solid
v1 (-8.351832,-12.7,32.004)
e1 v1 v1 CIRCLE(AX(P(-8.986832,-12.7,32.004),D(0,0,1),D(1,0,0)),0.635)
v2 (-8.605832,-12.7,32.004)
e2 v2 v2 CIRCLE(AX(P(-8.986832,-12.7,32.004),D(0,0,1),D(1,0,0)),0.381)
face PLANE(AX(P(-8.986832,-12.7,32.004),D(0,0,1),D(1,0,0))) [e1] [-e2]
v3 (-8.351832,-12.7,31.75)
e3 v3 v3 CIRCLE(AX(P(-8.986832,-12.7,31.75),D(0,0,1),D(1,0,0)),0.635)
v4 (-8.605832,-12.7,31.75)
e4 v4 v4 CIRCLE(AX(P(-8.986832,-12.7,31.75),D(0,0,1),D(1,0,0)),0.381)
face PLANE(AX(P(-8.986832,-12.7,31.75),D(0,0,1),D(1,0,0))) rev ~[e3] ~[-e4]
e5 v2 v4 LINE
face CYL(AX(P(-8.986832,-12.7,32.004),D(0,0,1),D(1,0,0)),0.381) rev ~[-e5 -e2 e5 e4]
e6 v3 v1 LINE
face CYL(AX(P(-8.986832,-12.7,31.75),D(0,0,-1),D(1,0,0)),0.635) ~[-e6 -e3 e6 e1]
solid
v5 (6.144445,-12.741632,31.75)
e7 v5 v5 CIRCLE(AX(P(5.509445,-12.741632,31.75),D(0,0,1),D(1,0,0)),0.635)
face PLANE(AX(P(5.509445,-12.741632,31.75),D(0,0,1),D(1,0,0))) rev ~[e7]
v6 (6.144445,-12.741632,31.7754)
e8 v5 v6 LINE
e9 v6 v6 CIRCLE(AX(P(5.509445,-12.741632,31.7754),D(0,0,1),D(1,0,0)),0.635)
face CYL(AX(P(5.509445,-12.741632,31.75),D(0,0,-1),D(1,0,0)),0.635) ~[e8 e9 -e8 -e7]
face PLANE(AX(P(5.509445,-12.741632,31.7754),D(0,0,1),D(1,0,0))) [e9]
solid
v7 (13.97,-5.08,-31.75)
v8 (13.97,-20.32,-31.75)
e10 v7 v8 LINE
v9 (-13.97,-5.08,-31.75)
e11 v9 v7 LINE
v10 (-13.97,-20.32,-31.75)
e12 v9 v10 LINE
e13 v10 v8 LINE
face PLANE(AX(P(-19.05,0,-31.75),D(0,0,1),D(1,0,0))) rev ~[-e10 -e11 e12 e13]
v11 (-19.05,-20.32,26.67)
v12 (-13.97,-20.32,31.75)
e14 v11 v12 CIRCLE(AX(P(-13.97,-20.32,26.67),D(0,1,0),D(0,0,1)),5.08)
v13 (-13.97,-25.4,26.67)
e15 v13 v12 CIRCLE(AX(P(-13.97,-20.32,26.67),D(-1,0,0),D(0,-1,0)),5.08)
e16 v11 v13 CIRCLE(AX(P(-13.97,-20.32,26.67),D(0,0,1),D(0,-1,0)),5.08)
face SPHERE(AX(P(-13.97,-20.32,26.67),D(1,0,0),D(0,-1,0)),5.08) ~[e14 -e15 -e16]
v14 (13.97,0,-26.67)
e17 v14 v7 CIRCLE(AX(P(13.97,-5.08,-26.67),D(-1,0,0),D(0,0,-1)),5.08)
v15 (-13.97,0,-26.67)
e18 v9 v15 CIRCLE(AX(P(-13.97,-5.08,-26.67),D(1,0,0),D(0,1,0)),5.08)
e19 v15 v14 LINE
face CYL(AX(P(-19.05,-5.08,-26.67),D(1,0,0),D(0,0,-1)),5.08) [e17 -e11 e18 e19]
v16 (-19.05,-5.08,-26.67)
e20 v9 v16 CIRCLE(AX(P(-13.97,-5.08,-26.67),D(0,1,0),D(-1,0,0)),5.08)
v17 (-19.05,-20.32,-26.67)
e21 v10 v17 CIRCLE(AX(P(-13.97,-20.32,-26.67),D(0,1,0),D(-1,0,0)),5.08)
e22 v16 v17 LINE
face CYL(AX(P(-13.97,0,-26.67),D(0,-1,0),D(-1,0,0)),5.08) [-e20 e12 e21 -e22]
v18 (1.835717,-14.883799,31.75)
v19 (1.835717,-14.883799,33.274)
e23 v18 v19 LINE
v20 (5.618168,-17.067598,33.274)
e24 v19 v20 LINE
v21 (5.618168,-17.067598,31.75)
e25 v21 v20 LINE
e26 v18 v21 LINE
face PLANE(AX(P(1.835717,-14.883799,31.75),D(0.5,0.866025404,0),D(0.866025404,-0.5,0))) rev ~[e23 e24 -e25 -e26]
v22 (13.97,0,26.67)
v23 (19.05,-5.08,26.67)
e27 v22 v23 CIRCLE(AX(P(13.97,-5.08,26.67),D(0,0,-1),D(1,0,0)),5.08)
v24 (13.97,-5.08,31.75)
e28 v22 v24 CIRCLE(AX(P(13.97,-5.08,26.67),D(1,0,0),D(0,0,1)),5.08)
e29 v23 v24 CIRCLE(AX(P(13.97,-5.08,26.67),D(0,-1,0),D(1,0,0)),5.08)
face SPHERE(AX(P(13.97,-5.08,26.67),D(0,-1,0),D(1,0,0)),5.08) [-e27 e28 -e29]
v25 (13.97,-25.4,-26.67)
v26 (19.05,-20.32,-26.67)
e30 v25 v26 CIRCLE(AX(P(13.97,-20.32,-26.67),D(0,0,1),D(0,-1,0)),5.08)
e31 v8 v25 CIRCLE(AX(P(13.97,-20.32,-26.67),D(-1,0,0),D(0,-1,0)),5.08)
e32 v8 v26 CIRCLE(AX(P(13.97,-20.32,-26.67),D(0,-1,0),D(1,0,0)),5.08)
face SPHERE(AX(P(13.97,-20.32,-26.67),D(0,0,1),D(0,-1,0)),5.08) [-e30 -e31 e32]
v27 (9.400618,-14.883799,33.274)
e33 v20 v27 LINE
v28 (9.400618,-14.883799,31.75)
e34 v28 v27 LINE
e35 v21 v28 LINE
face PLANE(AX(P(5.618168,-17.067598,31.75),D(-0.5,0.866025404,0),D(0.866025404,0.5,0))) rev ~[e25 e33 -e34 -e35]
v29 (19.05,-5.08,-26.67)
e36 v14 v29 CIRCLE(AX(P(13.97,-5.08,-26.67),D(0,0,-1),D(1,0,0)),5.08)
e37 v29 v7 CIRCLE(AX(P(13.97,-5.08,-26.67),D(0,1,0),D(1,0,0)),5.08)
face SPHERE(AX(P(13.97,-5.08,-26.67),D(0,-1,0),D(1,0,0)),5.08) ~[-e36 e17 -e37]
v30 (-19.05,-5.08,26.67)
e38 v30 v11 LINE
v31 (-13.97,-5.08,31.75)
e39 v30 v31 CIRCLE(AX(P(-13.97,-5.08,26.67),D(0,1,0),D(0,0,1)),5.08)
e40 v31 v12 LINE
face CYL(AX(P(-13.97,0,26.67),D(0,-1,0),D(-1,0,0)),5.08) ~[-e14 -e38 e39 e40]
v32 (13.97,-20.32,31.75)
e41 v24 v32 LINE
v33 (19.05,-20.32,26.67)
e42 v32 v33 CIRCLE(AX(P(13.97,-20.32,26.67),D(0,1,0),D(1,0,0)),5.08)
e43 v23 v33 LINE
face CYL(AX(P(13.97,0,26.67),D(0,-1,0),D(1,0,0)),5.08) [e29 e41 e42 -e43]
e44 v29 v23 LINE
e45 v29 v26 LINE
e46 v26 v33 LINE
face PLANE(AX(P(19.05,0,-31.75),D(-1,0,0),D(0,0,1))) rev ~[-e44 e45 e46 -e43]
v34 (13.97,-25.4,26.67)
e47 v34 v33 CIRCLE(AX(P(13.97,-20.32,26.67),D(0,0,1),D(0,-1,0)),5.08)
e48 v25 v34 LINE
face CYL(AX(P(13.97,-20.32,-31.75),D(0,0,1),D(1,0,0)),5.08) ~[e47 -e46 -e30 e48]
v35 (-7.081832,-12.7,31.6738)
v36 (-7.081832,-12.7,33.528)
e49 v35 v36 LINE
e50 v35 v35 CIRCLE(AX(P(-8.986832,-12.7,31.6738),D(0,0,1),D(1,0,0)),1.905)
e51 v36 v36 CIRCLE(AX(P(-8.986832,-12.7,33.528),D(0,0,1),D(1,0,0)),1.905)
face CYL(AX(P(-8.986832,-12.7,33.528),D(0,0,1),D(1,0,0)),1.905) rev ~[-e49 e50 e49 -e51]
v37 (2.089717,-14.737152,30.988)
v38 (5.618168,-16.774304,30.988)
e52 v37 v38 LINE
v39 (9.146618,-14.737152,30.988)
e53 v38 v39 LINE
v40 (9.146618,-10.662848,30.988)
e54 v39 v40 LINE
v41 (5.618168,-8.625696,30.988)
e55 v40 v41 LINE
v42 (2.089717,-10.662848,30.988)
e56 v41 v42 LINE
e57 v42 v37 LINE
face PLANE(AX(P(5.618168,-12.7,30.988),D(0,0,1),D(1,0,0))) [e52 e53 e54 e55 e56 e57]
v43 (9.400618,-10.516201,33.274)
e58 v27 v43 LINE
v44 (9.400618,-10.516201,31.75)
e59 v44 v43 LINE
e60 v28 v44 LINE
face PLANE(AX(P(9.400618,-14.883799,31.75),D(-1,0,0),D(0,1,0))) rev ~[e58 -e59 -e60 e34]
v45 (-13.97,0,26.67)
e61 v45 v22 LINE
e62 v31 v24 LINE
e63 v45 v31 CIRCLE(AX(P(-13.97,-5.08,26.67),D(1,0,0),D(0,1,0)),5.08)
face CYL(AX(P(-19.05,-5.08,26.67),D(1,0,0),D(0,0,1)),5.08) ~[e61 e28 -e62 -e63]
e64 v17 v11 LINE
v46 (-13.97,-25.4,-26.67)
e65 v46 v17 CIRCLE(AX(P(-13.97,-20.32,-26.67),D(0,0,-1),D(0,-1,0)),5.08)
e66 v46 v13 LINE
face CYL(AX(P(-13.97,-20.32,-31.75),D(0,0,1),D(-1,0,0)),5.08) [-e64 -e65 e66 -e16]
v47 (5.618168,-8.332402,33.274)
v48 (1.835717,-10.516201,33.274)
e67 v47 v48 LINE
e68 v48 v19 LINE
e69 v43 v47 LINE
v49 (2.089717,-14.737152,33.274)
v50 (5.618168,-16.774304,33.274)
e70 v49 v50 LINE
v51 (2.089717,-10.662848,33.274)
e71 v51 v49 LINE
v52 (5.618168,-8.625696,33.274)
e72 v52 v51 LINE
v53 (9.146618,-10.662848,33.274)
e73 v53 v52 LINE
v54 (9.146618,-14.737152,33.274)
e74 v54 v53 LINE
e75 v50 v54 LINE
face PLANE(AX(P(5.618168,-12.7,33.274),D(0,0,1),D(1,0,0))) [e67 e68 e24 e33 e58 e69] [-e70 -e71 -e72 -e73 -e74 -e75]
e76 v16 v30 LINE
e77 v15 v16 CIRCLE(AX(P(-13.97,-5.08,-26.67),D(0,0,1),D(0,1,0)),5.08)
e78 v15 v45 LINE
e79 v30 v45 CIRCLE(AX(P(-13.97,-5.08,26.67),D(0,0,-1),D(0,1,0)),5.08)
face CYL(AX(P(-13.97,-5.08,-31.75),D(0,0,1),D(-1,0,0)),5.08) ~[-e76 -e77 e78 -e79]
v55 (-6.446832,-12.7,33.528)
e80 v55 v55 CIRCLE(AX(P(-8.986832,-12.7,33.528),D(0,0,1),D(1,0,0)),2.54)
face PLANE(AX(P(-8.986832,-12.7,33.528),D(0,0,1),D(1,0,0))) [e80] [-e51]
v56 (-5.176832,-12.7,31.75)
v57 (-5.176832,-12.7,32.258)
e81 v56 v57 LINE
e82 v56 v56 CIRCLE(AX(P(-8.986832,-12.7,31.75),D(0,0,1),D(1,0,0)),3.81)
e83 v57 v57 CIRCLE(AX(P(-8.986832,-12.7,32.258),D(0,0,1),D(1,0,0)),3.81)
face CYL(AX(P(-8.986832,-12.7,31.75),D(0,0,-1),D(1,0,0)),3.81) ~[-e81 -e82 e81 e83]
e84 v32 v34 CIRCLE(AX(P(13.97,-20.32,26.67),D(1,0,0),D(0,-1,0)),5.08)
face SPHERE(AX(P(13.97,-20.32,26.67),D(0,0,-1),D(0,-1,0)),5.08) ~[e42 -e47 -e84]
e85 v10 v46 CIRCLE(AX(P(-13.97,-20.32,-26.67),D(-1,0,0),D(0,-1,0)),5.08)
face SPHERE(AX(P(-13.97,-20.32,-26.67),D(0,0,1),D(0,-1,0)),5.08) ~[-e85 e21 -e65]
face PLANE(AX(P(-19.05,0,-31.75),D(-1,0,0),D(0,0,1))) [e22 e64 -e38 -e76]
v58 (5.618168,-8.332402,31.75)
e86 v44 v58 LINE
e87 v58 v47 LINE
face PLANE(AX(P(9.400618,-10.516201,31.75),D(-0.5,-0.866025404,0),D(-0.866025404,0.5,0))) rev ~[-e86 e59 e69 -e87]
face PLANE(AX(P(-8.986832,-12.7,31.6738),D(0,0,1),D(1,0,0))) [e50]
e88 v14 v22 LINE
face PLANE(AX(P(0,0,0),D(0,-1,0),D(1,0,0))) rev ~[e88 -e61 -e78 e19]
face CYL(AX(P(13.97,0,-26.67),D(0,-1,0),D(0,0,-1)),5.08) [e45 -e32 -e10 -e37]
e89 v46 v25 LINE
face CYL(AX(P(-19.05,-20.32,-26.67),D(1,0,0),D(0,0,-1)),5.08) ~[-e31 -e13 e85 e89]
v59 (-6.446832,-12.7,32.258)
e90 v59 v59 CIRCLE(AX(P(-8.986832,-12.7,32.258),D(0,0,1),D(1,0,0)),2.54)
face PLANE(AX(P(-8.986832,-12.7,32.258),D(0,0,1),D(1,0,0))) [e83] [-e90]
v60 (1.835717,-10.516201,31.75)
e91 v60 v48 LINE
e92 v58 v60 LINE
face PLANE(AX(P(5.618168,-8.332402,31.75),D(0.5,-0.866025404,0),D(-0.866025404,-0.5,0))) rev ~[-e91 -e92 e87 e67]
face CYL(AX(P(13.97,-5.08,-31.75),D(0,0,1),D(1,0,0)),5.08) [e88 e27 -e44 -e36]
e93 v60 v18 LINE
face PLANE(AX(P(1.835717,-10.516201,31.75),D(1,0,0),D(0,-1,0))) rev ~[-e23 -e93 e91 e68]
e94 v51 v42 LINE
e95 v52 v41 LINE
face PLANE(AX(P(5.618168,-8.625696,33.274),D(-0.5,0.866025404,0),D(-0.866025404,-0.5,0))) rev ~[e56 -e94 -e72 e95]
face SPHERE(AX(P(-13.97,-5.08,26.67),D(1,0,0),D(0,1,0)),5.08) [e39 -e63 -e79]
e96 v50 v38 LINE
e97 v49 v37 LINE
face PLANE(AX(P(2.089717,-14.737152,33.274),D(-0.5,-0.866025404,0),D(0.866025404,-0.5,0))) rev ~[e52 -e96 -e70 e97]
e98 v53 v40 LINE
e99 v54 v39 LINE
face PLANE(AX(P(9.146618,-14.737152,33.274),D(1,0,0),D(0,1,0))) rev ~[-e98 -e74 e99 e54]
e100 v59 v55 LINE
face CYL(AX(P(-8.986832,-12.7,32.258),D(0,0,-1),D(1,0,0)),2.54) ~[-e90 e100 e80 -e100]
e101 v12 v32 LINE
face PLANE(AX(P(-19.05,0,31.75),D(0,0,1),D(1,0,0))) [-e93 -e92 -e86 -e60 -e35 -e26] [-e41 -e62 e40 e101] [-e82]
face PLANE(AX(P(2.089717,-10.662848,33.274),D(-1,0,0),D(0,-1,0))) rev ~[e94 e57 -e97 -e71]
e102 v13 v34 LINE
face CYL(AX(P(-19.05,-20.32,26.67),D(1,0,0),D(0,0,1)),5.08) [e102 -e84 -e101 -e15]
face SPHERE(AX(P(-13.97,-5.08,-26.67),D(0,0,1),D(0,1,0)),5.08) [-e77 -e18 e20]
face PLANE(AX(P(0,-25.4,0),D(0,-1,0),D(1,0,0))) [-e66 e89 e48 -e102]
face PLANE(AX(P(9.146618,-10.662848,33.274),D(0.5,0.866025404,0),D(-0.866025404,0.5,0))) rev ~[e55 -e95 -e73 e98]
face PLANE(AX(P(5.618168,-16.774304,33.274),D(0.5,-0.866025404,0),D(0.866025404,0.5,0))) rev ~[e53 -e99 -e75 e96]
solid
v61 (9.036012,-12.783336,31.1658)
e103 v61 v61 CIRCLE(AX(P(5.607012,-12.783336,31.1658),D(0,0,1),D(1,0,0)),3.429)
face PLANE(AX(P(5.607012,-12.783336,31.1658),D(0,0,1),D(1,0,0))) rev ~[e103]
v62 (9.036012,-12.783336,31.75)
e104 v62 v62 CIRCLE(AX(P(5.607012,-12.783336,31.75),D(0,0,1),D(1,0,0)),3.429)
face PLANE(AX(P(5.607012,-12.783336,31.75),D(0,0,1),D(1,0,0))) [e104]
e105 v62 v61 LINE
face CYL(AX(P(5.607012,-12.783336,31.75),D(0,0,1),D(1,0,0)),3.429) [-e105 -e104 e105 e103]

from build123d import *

# Parameters (mm, degrees)
F0_W      = 38.1
F0_H      = 63.5
F1_DEPTH  = 25.4
F2_R      = 5.08
F3_R      = 3.81
F4_DEPTH  = 0.508
F5_R      = 2.54
F6_DEPTH  = 1.27
F7_R      = 1.905
F8_DEPTH  = 1.8542
F10_DEPTH = 1.524
F13_DEPTH = 2.286
F14_R     = 3.429
F15_DEPTH = 0.5842
F16_R     = 0.635
F17_DEPTH = 0.0254
F18_R     = 0.635
F19_DEPTH = 0.254
F20_R     = 0.381
F21_DEPTH = 3.8354


with BuildPart() as f1:
    # F0 (on Front) → F1 (new body)
    with BuildSketch(Plane.XZ):
        Rectangle(F0_W, F0_H)
    extrude(amount=F1_DEPTH)

    # F2
    f2_edges = [f1.edges().sort_by_distance(p)[0] for p in [
        (19.05, -25.4, 0),
        (0, -25.4, 31.75),
        (-19.05, -25.4, 0),
        (0, -25.4, -31.75),
        (19.05, -12.7, -31.75),
        (19.05, -12.7, 31.75),
        (19.05, 0, 0),
        (0, 0, 31.75),
        (-19.05, 0, 0),
        (0, 0, -31.75),
        (-19.05, -12.7, 31.75),
        (-19.05, -12.7, -31.75),
    ]]
    fillet(f2_edges, radius=F2_R)

    # F3 (on face) → F4 (join)
    with BuildSketch(Plane.XY.offset(31.75)):
        with Locations((-8.9868323129, -12.7)):
            Circle(F3_R)
    extrude(amount=F4_DEPTH)

    # F5 (on face) → F6 (join)
    with BuildSketch(Plane.XY.offset(32.258)):
        with Locations((-8.9868323129, -12.7)):
            Circle(F5_R)
    extrude(amount=F6_DEPTH)

    # F7 (on face) → F8 (cut, symmetric)
    with BuildSketch(Plane.XY.offset(33.528)):
        with Locations((-8.9868323129, -12.7)):
            Circle(F7_R)
    extrude(amount=F8_DEPTH, both=True, mode=Mode.SUBTRACT)

    # F9 (on face) → F10 (join)
    with BuildSketch(Plane.XY.offset(31.75)):
        Polygon((9.4006182914, -14.8837988746), (9.4006182914, -10.5162011254), (5.6181676871, -8.3324022508), (1.8357170827, -10.5162011254), (1.8357170827, -14.8837988746), (5.6181676871, -17.0675977492), align=None)
    extrude(amount=F10_DEPTH)

    # F12 (on face) → F13 (cut)
    with BuildSketch(Plane.XY.offset(33.274)):
        Polygon((9.1466182914, -10.6628480938), (5.6181676871, -8.6256961876), (2.0897170827, -10.6628480938), (2.0897170827, -14.7371519062), (5.6181676871, -16.7743038124), (9.1466182914, -14.7371519062), align=None)
    extrude(amount=-F13_DEPTH, mode=Mode.SUBTRACT)


with BuildPart() as f15:
    # F14 (on face) → F15 (new body)
    with BuildSketch(Plane.XY.offset(31.75)):
        with Locations((5.6070124581, -12.7833363355)):
            Circle(F14_R)
    extrude(amount=-F15_DEPTH)


with BuildPart() as f17:
    # F16 (on face) → F17 (new body)
    with BuildSketch(Plane.XY.offset(31.75)):
        with Locations((5.5094454437, -12.7416318282)):
            Circle(F16_R)
    extrude(amount=F17_DEPTH)


with BuildPart() as f19:
    # F18 (on face) → F19 (new body)
    with BuildSketch(Plane.XY.offset(31.75)):
        with Locations((-8.9868323129, -12.7)):
            Circle(F18_R)
    extrude(amount=F19_DEPTH)

    # F20 (on face) → F21 (cut)
    with BuildSketch(Plane.XY.offset(32.004)):
        with Locations((-8.9868323129, -12.7)):
            Circle(F20_R)
    extrude(amount=-F21_DEPTH, mode=Mode.SUBTRACT)


solid = Compound([f1.part, f15.part, f17.part, f19.part])
